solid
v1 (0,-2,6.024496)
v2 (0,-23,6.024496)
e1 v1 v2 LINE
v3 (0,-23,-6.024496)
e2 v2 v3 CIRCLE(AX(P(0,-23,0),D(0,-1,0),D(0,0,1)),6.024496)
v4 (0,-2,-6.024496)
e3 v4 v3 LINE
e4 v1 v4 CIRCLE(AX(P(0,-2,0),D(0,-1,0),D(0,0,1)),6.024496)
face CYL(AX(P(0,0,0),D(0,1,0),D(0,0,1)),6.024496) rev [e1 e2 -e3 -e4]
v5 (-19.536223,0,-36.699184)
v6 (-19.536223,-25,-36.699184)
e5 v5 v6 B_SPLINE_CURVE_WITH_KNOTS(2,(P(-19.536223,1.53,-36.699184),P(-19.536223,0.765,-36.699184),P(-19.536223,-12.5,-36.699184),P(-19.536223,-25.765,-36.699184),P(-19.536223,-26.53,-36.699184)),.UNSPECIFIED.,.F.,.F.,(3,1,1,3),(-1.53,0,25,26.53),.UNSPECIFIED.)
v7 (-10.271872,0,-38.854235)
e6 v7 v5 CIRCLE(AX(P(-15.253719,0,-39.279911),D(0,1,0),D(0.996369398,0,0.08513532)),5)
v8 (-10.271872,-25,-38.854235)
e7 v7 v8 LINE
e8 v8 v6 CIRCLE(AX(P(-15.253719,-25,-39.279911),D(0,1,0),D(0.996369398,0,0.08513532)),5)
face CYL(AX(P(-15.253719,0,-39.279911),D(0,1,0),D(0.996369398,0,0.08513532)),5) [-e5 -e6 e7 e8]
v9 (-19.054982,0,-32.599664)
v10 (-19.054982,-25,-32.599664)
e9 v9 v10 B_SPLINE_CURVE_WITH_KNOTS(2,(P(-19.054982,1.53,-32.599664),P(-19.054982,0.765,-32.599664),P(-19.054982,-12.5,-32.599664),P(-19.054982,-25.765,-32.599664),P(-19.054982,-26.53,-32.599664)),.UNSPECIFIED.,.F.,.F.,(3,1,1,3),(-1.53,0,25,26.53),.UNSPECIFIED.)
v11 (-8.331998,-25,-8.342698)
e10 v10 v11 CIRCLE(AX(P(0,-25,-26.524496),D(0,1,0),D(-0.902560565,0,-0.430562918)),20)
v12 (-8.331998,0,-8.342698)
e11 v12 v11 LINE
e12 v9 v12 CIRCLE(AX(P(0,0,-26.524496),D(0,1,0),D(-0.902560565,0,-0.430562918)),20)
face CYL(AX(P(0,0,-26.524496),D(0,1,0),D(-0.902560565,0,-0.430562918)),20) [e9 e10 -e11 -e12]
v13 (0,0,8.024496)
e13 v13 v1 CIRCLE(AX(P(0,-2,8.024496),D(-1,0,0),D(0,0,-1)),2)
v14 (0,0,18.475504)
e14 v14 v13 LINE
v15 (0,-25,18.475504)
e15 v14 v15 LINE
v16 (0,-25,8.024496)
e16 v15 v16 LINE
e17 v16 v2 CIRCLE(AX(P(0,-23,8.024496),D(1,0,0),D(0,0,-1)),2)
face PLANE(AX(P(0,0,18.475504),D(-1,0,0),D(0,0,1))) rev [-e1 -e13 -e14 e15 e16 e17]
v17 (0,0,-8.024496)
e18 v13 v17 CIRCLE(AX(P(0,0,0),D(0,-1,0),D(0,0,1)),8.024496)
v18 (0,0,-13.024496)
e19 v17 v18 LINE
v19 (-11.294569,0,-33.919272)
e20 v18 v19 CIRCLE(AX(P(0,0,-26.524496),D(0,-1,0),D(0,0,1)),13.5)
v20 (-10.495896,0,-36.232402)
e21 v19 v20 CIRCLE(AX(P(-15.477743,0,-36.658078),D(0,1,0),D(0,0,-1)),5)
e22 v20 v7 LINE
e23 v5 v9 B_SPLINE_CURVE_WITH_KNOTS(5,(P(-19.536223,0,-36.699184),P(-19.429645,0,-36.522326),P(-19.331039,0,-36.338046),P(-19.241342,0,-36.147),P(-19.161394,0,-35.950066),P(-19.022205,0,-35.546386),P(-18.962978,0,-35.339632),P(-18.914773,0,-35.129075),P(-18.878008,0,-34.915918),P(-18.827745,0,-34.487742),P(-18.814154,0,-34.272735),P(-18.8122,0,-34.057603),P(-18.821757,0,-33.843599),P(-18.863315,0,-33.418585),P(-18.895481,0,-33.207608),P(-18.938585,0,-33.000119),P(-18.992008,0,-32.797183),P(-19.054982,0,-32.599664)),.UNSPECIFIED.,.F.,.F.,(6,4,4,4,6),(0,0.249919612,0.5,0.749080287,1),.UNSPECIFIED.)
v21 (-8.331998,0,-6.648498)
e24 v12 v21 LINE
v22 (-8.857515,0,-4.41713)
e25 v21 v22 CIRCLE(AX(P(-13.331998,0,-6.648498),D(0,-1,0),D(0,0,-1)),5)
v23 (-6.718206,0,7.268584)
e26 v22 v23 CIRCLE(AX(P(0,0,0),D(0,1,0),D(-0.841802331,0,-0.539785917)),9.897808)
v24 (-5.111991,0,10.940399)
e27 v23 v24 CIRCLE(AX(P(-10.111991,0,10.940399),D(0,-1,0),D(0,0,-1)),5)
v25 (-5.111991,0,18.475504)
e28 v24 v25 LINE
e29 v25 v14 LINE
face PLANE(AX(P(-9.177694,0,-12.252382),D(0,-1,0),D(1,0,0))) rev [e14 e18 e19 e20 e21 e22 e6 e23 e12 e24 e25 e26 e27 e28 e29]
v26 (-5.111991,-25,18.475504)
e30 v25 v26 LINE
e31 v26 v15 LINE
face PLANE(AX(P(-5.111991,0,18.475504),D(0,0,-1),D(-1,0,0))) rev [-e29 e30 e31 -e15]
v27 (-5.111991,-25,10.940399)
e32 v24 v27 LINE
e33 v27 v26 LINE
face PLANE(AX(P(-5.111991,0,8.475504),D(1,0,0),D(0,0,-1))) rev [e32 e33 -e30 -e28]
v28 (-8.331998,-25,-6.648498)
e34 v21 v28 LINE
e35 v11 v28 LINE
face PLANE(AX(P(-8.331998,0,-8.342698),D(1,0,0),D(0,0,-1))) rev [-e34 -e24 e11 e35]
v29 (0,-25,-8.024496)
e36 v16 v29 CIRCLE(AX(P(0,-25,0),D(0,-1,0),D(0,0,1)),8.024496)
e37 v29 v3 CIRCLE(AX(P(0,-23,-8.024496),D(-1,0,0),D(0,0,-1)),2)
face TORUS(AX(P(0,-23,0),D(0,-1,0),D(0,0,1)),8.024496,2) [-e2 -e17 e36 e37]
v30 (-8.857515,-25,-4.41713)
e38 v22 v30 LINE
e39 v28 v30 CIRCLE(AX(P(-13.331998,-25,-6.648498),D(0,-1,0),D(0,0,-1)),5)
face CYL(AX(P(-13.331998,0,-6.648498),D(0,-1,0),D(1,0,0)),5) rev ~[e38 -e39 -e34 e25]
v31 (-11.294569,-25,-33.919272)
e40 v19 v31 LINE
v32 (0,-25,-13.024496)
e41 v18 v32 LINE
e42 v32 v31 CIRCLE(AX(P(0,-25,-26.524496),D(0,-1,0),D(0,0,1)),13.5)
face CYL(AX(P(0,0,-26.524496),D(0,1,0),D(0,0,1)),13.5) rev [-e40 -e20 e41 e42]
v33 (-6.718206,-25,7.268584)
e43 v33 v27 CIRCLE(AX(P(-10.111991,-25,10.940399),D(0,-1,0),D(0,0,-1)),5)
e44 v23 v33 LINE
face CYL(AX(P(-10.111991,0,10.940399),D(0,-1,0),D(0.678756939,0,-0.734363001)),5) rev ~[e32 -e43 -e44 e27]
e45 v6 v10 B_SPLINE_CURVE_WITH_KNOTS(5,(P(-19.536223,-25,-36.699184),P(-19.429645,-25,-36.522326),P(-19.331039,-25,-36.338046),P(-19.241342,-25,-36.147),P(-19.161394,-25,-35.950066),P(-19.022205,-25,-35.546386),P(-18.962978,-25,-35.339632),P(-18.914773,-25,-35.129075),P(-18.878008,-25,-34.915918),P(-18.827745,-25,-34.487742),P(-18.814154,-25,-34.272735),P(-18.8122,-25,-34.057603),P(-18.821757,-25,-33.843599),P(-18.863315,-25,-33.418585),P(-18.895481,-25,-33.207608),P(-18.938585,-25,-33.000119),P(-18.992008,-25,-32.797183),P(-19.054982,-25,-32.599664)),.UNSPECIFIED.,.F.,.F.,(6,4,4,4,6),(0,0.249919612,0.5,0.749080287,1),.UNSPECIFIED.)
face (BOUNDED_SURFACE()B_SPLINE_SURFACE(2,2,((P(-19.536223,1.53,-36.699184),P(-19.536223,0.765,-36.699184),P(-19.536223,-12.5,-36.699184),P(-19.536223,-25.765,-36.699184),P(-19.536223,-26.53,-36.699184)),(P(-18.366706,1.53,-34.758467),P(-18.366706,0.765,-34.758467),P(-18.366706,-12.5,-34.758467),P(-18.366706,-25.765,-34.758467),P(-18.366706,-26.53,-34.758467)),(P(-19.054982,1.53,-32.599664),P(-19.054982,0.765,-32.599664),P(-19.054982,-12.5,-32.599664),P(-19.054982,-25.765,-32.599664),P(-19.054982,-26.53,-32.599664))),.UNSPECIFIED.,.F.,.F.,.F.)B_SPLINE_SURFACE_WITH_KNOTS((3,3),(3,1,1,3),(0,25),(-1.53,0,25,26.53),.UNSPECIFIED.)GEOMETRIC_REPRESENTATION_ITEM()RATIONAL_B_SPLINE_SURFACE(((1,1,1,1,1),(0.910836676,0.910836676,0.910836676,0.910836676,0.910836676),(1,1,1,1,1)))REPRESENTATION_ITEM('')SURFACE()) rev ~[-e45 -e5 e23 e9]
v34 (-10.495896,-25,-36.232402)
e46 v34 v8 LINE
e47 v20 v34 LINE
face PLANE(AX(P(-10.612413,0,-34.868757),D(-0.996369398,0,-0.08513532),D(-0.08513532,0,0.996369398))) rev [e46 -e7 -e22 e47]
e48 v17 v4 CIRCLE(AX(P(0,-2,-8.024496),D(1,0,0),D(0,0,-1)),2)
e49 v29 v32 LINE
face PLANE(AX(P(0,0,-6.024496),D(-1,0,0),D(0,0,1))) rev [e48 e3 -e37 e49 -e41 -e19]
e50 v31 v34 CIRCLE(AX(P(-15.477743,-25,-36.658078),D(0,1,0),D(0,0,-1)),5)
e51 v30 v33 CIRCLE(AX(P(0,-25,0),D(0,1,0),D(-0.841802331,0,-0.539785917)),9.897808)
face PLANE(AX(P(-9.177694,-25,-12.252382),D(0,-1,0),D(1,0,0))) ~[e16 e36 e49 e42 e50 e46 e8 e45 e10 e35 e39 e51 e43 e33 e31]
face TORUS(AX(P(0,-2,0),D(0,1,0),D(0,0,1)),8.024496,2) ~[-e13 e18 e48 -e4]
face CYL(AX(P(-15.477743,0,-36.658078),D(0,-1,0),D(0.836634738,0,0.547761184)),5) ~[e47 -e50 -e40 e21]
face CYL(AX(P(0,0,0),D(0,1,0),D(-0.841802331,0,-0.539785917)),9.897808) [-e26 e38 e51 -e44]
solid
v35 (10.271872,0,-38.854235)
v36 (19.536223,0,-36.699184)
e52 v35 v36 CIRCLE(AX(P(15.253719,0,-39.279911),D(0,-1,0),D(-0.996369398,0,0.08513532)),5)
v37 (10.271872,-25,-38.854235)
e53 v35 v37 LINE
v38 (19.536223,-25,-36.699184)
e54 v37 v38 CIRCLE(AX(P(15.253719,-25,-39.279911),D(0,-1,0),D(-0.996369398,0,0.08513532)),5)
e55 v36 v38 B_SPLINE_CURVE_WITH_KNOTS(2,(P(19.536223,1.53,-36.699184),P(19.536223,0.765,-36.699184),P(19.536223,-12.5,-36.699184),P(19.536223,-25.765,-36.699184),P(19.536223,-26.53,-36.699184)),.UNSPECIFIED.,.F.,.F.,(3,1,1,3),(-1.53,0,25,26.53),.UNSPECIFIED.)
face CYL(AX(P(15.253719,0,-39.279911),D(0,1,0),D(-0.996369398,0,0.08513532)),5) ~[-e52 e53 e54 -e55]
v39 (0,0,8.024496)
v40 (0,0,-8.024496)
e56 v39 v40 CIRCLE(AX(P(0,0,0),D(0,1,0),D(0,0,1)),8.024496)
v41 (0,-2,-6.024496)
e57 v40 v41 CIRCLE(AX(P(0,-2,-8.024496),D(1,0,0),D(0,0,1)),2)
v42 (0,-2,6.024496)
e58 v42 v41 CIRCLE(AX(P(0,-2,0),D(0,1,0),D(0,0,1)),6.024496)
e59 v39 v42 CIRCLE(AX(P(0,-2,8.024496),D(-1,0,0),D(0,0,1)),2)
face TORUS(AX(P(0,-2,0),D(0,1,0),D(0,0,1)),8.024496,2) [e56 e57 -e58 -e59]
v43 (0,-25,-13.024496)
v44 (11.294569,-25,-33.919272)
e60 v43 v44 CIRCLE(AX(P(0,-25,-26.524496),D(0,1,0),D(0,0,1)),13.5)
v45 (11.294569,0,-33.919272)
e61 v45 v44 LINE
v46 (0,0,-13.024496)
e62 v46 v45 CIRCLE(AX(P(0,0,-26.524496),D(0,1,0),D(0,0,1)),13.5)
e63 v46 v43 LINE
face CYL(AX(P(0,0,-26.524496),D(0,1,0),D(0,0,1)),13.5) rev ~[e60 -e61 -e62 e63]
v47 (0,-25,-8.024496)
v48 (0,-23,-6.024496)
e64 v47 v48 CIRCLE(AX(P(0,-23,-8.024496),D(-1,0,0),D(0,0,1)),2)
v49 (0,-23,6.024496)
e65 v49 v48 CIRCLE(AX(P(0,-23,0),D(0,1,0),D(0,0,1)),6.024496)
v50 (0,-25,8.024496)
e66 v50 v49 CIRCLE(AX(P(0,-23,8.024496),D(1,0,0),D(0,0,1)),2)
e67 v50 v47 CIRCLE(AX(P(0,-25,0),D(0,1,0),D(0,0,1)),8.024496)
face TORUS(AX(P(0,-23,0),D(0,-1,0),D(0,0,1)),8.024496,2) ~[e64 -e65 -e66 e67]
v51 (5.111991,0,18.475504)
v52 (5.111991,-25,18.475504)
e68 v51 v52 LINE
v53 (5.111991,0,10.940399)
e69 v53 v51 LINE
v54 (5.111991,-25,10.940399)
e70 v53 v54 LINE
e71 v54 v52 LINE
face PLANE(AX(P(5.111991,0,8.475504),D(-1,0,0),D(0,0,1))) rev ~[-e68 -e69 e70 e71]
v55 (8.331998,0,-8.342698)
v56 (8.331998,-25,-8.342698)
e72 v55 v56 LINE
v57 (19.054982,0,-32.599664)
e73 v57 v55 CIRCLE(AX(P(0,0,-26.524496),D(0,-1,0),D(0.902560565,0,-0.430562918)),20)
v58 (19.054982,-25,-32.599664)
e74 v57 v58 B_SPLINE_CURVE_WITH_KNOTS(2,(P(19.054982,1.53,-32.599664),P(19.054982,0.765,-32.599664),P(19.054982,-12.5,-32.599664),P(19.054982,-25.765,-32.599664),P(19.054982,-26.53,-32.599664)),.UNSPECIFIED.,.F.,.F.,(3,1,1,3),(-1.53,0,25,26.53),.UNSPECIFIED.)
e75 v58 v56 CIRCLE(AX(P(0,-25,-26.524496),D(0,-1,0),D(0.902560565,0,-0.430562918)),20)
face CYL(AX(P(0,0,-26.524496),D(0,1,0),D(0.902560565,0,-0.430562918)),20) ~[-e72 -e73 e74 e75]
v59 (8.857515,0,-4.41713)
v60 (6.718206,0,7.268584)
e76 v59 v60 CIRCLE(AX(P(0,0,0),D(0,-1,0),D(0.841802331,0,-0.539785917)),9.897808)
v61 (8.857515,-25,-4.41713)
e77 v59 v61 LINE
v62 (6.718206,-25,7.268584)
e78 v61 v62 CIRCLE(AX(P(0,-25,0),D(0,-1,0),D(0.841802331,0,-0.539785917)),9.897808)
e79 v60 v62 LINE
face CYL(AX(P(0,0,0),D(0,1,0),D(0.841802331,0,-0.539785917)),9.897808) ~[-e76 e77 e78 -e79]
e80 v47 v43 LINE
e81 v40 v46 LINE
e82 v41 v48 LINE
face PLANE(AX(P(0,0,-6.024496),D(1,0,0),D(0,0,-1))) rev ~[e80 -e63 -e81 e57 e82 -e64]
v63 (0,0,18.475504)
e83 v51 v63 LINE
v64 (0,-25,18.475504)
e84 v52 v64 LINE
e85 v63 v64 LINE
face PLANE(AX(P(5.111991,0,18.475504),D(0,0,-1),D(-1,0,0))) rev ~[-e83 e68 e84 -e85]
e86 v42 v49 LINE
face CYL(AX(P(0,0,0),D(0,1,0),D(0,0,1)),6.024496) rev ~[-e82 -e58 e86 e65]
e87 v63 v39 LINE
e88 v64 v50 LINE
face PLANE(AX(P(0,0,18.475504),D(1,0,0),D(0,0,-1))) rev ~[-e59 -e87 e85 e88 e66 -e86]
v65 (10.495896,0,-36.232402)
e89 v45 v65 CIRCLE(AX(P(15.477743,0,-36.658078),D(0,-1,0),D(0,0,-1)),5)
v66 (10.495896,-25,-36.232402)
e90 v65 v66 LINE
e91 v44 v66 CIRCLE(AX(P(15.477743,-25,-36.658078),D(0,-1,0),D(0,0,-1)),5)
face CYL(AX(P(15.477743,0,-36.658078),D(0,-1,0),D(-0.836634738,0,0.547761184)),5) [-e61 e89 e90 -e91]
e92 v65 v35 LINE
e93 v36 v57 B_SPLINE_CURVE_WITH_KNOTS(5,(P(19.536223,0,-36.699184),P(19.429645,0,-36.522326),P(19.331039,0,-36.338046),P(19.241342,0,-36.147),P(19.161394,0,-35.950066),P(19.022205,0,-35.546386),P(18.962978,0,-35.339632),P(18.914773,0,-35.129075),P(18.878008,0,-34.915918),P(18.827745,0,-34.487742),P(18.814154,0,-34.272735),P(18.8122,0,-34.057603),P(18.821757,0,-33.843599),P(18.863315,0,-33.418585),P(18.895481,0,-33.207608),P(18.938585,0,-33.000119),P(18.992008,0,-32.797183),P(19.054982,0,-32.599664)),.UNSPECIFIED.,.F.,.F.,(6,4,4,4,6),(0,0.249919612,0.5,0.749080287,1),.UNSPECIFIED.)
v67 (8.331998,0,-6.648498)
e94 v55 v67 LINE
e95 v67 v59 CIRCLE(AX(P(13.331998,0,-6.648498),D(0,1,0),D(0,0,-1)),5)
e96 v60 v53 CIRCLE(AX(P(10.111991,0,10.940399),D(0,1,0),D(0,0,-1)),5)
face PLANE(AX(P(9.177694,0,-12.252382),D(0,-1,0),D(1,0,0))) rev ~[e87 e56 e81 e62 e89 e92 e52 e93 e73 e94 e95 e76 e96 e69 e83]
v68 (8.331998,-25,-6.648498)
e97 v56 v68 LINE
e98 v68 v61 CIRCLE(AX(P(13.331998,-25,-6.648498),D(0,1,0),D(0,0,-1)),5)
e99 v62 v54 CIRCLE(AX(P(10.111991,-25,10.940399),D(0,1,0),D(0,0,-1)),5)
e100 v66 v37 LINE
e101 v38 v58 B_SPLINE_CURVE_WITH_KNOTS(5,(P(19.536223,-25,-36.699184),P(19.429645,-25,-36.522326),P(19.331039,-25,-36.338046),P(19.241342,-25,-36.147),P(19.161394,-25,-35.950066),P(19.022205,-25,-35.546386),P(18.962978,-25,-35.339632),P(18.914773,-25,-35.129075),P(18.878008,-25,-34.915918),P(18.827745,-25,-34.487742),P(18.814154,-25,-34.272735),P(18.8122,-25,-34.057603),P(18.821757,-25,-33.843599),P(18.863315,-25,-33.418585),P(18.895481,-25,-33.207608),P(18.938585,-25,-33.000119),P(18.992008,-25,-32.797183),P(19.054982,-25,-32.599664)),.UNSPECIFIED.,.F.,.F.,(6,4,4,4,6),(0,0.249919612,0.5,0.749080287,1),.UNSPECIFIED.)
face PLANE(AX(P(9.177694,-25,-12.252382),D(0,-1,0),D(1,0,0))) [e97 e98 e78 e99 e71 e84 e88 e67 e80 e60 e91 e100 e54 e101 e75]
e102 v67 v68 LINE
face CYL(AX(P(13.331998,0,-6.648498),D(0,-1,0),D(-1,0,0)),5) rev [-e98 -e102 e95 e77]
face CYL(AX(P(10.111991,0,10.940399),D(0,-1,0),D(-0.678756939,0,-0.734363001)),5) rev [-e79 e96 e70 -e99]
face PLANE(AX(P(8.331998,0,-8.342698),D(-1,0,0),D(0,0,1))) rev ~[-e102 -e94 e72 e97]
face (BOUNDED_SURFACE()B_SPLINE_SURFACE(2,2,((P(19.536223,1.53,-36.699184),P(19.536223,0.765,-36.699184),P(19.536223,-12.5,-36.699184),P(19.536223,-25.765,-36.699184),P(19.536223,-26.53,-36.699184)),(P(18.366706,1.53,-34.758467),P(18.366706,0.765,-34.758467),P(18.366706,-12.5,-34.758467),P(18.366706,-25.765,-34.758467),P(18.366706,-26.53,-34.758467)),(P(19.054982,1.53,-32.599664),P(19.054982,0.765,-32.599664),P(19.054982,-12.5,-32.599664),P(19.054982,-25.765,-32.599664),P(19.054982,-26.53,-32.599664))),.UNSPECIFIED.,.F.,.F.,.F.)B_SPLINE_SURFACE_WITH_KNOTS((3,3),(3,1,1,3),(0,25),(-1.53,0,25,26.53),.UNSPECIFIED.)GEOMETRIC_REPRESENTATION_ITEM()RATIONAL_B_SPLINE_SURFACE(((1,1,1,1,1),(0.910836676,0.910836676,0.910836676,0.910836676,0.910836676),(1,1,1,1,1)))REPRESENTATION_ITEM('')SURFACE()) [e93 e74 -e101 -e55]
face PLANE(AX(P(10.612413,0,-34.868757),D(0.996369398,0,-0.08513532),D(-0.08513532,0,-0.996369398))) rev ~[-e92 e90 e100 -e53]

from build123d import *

# Parameters (mm, degrees)
F1_DEPTH = 25
F3_R     = 5
F3_2_R   = 5
F4_R     = 2
F4_2_R   = 2


with BuildPart() as f1:
    # F0 (on Front) → F1 (new body)
    with BuildSketch(Plane.XZ):
        with BuildLine():
            ThreePointArc((0, -13.0244963626), (12.1428481509, -20.6252388852), (10.6124130002, -34.8687572833))
            Line((10.6124130002, -34.8687572833), (10.2718717194, -38.8542348753))
            ThreePointArc((10.2718717194, -38.8542348753), (17.410017551, -43.7910505016), (18.0512113015, -35.1357547229))
            ThreePointArc((18.0512113015, -35.1357547229), (18.8012077702, -19.7043360726), (8.3319982441, -8.3426976271))
            Line((8.3319982441, -8.3426976271), (8.3319982441, -5.3426976271))
            ThreePointArc((8.3319982441, -5.3426976271), (9.6395478341, 2.246270293), (5.111990881, 8.4755036374))
            Line((5.111990881, 8.4755036374), (5.111990881, 18.4755036374))
            Line((5.111990881, 18.4755036374), (0, 18.4755036374))
            Line((0, 18.4755036374), (0, 6.0244963626))
            ThreePointArc((0, 6.0244963626), (6.0244963626, 0), (0, -6.0244963626))
            Line((0, -6.0244963626), (0, -13.0244963626))
        make_face()
    extrude(amount=F1_DEPTH)


with BuildPart() as f2_1:
    # F2: instance of F1
    add(f1.part.mirror(Plane.YZ))

    # F3#2
    f3_2_edges = [f2_1.edges().sort_by_distance(p)[0] for p in [
        (-10.612413, -12.5, -34.868757),
        (-18.051211, -12.5, -35.135755),
        (-5.111991, -12.5, 8.475504),
        (-8.331998, -12.5, -5.342698),
    ]]
    fillet(f3_2_edges, radius=F3_2_R)

    # F4#2
    f4_2_edges = [f2_1.edges().sort_by_distance(p)[0] for p in [
        (-6.024496, -25, 0),
        (-6.024496, 0, 0),
    ]]
    fillet(f4_2_edges, radius=F4_2_R)


with BuildPart() as f1_1:
    add(f1.part)

    # F3
    f3_edges = [f1_1.edges().sort_by_distance(p)[0] for p in [
        (10.612413, -12.5, -34.868757),
        (18.051211, -12.5, -35.135755),
        (5.111991, -12.5, 8.475504),
        (8.331998, -12.5, -5.342698),
    ]]
    fillet(f3_edges, radius=F3_R)

    # F4
    f4_edges = [f1_1.edges().sort_by_distance(p)[0] for p in [
        (6.024496, -25, 0),
        (6.024496, 0, 0),
    ]]
    fillet(f4_edges, radius=F4_R)


solid = Compound([f2_1.part, f1_1.part])
